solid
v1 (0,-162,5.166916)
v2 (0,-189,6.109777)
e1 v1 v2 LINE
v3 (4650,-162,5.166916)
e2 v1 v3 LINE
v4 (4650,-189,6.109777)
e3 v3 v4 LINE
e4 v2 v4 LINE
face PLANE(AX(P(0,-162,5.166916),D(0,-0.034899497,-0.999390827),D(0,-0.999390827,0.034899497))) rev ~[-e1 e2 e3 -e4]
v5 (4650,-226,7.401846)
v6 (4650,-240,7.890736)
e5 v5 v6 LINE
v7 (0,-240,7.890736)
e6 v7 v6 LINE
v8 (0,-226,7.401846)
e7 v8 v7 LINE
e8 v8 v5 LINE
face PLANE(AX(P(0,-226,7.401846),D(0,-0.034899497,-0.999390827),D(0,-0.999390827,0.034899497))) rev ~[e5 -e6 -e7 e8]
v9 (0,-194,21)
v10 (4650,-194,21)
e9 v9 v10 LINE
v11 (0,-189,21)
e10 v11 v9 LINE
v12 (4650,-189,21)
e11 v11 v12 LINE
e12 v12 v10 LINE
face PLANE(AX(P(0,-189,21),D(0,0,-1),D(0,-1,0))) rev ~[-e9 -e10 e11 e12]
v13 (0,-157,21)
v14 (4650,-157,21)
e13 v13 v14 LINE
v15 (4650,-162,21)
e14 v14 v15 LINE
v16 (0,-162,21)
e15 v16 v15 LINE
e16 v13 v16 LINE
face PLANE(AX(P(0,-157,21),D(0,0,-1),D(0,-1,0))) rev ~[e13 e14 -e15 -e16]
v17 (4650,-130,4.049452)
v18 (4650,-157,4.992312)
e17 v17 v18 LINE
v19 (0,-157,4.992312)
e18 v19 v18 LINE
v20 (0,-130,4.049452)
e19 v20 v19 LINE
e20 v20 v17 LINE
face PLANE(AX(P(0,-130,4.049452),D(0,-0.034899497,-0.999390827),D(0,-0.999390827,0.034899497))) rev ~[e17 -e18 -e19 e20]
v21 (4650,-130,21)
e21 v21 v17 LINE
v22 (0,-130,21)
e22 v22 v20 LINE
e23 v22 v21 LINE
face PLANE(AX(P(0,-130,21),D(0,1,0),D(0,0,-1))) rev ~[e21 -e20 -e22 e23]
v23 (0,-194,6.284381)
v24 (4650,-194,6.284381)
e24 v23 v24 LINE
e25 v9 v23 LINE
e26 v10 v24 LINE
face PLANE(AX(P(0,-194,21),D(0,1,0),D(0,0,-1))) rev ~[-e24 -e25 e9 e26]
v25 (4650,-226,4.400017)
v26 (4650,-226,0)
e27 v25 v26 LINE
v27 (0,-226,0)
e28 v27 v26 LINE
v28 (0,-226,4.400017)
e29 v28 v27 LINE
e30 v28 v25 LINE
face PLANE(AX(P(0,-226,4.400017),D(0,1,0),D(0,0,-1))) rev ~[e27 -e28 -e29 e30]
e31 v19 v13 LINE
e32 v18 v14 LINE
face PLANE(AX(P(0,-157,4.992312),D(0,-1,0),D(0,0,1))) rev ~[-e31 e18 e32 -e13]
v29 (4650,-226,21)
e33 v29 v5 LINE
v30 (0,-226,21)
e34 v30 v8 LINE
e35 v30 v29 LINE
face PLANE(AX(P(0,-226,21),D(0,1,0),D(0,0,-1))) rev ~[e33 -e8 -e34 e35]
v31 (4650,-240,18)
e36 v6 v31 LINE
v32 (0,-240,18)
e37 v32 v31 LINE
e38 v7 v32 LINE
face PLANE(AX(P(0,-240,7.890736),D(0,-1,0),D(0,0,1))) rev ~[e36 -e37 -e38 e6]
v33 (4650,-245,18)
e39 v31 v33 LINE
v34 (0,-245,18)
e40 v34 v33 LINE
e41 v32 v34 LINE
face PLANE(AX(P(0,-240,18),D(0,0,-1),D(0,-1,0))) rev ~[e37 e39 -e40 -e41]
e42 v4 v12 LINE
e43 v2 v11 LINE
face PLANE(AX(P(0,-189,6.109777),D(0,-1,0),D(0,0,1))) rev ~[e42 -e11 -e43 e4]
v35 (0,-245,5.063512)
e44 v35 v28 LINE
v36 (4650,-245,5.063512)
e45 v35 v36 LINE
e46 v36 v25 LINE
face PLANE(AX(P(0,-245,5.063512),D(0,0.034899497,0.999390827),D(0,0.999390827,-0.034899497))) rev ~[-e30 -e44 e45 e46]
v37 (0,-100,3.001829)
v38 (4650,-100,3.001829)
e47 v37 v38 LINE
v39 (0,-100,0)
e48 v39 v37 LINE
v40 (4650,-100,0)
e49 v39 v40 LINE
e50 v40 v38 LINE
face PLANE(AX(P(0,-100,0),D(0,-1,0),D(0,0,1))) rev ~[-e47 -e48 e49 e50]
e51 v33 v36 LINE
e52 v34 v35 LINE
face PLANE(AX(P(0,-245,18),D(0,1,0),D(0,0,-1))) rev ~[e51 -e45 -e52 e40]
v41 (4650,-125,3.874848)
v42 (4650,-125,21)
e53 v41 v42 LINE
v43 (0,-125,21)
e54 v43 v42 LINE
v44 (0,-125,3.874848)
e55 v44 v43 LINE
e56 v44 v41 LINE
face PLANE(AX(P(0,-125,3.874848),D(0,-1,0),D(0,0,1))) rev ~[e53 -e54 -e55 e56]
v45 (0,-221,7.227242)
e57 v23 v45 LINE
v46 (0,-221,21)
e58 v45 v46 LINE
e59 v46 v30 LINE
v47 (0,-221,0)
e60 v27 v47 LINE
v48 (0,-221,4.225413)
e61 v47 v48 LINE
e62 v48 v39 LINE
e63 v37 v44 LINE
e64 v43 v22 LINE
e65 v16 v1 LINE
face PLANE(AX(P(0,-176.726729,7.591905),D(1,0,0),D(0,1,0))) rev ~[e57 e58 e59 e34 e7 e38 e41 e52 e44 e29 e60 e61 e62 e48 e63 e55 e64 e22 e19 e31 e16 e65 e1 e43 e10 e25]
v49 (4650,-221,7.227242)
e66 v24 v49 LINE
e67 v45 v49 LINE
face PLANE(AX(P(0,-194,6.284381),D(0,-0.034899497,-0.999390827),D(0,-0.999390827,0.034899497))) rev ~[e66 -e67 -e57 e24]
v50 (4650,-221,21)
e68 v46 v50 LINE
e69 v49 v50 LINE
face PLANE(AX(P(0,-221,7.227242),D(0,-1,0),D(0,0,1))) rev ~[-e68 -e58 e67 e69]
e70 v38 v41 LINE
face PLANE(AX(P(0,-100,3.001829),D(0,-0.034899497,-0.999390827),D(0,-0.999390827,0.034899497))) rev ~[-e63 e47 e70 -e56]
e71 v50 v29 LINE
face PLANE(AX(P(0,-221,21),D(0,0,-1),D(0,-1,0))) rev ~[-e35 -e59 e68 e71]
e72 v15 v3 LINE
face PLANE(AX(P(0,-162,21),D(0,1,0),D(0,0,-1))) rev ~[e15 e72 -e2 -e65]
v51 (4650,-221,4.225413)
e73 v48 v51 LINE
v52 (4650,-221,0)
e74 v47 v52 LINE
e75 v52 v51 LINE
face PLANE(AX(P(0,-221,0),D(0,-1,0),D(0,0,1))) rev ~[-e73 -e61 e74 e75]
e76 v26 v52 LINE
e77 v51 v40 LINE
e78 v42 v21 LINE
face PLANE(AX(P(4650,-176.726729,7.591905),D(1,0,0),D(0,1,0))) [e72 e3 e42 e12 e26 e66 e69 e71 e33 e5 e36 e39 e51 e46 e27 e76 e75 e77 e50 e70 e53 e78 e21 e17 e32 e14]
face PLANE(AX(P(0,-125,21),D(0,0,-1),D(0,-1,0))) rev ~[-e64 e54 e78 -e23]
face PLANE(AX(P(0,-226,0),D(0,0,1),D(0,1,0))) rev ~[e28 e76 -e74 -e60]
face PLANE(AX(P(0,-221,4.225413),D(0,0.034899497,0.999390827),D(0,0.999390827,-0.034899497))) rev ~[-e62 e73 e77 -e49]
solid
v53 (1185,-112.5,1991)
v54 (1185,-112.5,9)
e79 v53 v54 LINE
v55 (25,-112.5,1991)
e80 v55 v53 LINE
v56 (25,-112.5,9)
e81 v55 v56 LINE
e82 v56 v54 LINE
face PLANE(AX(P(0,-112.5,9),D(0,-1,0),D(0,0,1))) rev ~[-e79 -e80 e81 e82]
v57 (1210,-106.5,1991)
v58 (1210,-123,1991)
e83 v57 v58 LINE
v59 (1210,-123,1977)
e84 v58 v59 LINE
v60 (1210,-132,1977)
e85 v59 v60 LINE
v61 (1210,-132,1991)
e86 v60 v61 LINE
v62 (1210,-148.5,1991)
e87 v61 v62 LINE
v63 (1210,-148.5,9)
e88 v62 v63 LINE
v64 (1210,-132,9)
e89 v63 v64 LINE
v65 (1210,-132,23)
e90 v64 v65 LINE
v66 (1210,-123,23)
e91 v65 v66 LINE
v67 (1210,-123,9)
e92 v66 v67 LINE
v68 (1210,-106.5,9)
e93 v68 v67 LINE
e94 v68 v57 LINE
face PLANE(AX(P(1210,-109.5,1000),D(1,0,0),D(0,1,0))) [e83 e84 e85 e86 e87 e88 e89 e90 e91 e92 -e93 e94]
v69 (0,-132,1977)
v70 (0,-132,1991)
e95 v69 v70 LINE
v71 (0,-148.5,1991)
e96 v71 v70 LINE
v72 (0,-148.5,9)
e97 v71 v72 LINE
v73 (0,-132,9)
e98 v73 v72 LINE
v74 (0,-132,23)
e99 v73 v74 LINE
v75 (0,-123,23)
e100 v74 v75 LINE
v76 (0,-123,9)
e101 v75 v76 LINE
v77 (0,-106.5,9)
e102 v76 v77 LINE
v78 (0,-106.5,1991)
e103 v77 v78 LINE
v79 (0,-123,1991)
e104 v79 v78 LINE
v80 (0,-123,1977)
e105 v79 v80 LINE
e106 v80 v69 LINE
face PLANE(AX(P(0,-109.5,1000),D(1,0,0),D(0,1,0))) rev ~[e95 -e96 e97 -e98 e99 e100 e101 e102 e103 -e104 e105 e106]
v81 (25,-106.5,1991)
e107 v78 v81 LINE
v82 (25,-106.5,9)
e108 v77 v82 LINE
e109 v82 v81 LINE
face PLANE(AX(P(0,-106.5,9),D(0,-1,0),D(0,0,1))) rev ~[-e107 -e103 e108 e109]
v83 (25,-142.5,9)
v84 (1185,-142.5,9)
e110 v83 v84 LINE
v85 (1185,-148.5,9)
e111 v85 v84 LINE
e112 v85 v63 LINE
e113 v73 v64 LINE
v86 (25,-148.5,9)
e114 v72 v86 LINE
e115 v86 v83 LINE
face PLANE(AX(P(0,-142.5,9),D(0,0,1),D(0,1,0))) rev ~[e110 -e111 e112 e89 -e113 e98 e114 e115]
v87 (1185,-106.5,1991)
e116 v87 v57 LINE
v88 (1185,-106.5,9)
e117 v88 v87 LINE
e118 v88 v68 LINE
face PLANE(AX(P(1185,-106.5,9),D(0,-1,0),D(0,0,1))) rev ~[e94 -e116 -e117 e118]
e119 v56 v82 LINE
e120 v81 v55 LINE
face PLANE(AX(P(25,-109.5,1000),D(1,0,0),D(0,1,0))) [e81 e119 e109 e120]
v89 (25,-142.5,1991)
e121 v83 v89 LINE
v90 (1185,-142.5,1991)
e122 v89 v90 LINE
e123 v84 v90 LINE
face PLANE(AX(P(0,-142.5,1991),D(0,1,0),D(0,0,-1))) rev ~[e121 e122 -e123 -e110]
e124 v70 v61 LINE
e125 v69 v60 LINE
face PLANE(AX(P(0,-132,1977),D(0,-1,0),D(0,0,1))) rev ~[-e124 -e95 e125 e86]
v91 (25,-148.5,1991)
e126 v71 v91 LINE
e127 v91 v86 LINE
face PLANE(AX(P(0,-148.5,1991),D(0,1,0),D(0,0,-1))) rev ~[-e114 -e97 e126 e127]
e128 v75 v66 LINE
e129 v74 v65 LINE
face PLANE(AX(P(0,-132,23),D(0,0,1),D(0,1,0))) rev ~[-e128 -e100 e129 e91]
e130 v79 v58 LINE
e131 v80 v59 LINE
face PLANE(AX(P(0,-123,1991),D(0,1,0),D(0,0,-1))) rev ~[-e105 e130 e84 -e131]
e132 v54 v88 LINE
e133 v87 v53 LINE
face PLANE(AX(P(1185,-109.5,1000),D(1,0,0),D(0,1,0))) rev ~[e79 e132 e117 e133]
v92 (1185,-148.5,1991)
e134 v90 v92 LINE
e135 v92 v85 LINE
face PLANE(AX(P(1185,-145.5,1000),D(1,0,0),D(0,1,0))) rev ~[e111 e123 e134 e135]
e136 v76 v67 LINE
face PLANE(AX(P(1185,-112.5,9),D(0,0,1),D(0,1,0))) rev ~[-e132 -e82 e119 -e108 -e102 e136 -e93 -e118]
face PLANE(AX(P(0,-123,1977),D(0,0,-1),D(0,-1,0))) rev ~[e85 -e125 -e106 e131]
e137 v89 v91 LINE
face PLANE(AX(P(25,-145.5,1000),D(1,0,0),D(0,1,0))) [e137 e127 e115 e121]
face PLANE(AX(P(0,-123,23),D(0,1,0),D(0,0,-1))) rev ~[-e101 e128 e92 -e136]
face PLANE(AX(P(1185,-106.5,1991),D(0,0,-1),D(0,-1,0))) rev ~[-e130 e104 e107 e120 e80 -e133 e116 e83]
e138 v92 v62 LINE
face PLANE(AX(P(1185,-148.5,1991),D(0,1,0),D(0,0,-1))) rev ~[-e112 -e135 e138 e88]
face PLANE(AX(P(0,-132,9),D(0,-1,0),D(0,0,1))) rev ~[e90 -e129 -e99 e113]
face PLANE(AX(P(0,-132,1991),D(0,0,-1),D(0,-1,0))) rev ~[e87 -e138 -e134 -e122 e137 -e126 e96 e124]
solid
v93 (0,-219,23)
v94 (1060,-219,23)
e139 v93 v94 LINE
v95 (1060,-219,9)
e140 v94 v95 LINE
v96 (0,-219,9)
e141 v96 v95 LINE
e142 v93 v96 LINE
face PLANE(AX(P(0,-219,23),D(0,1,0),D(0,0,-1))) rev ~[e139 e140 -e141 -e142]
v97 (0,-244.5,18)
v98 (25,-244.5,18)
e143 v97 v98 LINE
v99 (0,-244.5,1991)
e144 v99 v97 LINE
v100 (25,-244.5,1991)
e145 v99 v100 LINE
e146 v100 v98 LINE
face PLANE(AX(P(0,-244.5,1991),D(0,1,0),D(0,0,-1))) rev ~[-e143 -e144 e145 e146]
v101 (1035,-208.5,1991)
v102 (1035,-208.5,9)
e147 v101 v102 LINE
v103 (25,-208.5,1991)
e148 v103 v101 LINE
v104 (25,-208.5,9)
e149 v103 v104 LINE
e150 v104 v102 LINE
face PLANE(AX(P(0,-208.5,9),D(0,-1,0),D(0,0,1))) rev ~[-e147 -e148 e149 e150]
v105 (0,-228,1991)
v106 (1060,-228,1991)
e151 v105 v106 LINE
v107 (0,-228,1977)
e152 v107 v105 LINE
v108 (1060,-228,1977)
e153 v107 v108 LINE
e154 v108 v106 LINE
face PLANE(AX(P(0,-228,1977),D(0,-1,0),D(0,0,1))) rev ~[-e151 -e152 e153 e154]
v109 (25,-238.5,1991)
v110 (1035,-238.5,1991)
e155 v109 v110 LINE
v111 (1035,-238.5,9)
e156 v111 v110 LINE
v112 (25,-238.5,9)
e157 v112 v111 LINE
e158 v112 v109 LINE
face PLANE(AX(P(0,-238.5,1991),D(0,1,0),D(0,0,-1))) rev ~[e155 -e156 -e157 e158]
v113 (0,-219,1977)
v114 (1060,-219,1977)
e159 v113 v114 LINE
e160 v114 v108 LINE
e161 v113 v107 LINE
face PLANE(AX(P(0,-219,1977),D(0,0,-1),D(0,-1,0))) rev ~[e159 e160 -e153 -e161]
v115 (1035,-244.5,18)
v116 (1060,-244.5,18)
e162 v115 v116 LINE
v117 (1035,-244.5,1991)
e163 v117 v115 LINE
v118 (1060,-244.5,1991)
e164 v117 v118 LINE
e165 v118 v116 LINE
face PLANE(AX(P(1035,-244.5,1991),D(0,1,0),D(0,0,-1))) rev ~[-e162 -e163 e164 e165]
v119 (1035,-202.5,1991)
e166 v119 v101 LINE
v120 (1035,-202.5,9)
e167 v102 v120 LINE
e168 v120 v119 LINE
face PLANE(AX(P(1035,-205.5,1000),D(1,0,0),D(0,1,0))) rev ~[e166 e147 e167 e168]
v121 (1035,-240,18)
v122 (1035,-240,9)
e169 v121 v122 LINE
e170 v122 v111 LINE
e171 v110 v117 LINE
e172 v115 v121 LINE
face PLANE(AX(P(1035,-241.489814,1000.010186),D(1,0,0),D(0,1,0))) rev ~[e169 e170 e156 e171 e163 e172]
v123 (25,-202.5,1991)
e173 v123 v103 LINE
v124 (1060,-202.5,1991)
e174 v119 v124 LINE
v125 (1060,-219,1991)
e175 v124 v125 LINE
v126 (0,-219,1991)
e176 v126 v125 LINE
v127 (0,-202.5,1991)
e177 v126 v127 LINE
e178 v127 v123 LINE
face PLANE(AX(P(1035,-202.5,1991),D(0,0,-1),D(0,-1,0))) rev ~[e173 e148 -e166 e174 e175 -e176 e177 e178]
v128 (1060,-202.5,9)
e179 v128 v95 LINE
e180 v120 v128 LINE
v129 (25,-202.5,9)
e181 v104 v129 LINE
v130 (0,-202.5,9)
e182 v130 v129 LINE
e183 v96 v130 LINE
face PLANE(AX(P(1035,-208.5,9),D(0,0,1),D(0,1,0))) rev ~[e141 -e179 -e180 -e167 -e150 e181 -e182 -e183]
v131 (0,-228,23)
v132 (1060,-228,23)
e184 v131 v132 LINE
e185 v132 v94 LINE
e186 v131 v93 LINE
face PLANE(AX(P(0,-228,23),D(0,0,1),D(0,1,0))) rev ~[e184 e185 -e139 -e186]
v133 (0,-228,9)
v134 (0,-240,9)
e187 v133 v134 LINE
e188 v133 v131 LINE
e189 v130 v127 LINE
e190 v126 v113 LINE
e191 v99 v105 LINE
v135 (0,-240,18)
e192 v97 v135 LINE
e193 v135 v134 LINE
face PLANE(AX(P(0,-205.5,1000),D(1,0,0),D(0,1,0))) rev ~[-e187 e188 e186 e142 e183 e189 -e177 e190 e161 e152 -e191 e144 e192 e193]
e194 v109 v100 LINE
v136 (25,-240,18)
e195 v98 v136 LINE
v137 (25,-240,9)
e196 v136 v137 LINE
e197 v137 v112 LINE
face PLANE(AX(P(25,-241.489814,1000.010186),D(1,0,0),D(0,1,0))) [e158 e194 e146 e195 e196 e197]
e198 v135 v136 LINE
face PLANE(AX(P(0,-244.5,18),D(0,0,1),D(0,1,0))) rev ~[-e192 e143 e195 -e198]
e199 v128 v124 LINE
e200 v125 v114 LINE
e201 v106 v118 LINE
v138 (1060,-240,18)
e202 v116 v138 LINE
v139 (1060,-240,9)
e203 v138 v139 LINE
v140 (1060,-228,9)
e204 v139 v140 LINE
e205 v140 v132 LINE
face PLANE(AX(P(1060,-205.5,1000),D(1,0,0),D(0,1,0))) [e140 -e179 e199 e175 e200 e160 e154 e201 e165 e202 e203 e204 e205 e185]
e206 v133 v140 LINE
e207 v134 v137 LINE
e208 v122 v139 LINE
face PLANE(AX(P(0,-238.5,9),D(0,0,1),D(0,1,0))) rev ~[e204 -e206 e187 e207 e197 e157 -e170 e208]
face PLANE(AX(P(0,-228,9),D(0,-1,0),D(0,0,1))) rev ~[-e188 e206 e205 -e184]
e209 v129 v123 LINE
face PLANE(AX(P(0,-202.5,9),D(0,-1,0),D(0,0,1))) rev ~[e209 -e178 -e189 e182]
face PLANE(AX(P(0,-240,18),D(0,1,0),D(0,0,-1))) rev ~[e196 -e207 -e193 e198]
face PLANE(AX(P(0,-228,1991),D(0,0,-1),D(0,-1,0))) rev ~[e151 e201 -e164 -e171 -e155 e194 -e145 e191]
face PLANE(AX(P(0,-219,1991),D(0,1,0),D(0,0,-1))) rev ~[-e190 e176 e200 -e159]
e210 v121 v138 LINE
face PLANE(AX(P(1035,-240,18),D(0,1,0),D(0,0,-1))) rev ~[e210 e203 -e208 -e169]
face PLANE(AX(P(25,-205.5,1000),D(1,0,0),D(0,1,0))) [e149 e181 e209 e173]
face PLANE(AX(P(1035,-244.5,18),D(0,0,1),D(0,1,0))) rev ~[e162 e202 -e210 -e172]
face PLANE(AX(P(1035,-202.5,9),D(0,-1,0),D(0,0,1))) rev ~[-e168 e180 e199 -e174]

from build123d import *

# Parameters (mm, degrees)
F0_W     = 4.5
F0_H     = 9
F1_DEPTH = 4650
F2_DEPTH = 1210
F3_DEPTH = 25
F4_START = 1185
F4_DEPTH = 25
F5_DEPTH = 1060
F6_DEPTH = 25
F7_START = 1035
F7_DEPTH = 25


with BuildPart() as f1:
    # F0 (on Right) → F1 (new body)
    with BuildSketch(Plane.YZ):
        Polygon((-221, 4.2254131085), (-100, 0), (-100, 3.0018286329), (-125, 3.8748478702), (-125, 21), (-130, 21), (-130, 4.0494517176), (-157, 4.9923124939), (-157, 21), (-162, 21), (-162, 5.1669163414), (-189, 6.1097771177), (-189, 21), (-194, 21), (-194, 6.2843809651), (-221, 7.2272417414), (-221, 21), (-226, 21), (-226, 7.4018455889), (-240, 7.8907363617), (-240, 9), (-244.5, 9), (-244.5, 18), (-245, 18), (-245, 5.0635115763), (-226, 4.400016956), (-226, 0), (-221, 0), align=None)
        with Locations((-242.25, 13.5)):
            Rectangle(F0_W, F0_H)
    extrude(amount=F1_DEPTH)


with BuildPart() as f2:
    # F0 (on Right) → F2 (new body)
    with BuildSketch(Plane.YZ):
        Polygon((-132, 23), (-127.5, 23), (-123, 23), (-123, 9), (-112.5, 9), (-112.5, 1991), (-123, 1991), (-123, 1977), (-127.5, 1977), (-132, 1977), (-132, 1991), (-142.5, 1991), (-142.5, 9), (-132, 9), align=None)
    extrude(amount=F2_DEPTH)

    # F0 (on Right) → F3 (join)
    with BuildSketch(Plane.YZ):
        Polygon((-112.5, 1991), (-112.5, 9), (-106.5, 9), (-106.5, 1000), (-106.5, 1991), align=None)
        Polygon((-148.5, 9), (-142.5, 9), (-142.5, 1991), (-148.5, 1991), (-148.5, 1000), align=None)
    extrude(amount=F3_DEPTH)

    # F0 (on Right) → F4 (join)
    with BuildSketch(Plane.YZ.offset(F4_START)):
        Polygon((-112.5, 1991), (-112.5, 9), (-106.5, 9), (-106.5, 1000), (-106.5, 1991), align=None)
        Polygon((-148.5, 9), (-142.5, 9), (-142.5, 1991), (-148.5, 1991), (-148.5, 1000), align=None)
    extrude(amount=F4_DEPTH)


with BuildPart() as f5:
    # F0 (on Right) → F5 (new body)
    with BuildSketch(Plane.YZ):
        Polygon((-238.5, 1991), (-238.5, 9), (-228, 9), (-228, 23), (-223.5, 23), (-219, 23), (-219, 9), (-208.5, 9), (-208.5, 1991), (-219, 1991), (-219, 1977), (-223.5, 1977), (-228, 1977), (-228, 1991), align=None)
    extrude(amount=F5_DEPTH)

    # F0 (on Right) → F6 (join)
    with BuildSketch(Plane.YZ):
        Polygon((-208.5, 1991), (-208.5, 9), (-202.5, 9), (-202.5, 1000), (-202.5, 1991), align=None)
        Polygon((-244.5, 1000), (-244.5, 18), (-240, 18), (-240, 9), (-238.5, 9), (-238.5, 1991), (-244.5, 1991), align=None)
    extrude(amount=F6_DEPTH)

    # F0 (on Right) → F7 (join)
    with BuildSketch(Plane.YZ.offset(F7_START)):
        Polygon((-208.5, 1991), (-208.5, 9), (-202.5, 9), (-202.5, 1000), (-202.5, 1991), align=None)
        Polygon((-244.5, 1000), (-244.5, 18), (-240, 18), (-240, 9), (-238.5, 9), (-238.5, 1991), (-244.5, 1991), align=None)
    extrude(amount=F7_DEPTH)


solid = Compound([f1.part, f2.part, f5.part])
